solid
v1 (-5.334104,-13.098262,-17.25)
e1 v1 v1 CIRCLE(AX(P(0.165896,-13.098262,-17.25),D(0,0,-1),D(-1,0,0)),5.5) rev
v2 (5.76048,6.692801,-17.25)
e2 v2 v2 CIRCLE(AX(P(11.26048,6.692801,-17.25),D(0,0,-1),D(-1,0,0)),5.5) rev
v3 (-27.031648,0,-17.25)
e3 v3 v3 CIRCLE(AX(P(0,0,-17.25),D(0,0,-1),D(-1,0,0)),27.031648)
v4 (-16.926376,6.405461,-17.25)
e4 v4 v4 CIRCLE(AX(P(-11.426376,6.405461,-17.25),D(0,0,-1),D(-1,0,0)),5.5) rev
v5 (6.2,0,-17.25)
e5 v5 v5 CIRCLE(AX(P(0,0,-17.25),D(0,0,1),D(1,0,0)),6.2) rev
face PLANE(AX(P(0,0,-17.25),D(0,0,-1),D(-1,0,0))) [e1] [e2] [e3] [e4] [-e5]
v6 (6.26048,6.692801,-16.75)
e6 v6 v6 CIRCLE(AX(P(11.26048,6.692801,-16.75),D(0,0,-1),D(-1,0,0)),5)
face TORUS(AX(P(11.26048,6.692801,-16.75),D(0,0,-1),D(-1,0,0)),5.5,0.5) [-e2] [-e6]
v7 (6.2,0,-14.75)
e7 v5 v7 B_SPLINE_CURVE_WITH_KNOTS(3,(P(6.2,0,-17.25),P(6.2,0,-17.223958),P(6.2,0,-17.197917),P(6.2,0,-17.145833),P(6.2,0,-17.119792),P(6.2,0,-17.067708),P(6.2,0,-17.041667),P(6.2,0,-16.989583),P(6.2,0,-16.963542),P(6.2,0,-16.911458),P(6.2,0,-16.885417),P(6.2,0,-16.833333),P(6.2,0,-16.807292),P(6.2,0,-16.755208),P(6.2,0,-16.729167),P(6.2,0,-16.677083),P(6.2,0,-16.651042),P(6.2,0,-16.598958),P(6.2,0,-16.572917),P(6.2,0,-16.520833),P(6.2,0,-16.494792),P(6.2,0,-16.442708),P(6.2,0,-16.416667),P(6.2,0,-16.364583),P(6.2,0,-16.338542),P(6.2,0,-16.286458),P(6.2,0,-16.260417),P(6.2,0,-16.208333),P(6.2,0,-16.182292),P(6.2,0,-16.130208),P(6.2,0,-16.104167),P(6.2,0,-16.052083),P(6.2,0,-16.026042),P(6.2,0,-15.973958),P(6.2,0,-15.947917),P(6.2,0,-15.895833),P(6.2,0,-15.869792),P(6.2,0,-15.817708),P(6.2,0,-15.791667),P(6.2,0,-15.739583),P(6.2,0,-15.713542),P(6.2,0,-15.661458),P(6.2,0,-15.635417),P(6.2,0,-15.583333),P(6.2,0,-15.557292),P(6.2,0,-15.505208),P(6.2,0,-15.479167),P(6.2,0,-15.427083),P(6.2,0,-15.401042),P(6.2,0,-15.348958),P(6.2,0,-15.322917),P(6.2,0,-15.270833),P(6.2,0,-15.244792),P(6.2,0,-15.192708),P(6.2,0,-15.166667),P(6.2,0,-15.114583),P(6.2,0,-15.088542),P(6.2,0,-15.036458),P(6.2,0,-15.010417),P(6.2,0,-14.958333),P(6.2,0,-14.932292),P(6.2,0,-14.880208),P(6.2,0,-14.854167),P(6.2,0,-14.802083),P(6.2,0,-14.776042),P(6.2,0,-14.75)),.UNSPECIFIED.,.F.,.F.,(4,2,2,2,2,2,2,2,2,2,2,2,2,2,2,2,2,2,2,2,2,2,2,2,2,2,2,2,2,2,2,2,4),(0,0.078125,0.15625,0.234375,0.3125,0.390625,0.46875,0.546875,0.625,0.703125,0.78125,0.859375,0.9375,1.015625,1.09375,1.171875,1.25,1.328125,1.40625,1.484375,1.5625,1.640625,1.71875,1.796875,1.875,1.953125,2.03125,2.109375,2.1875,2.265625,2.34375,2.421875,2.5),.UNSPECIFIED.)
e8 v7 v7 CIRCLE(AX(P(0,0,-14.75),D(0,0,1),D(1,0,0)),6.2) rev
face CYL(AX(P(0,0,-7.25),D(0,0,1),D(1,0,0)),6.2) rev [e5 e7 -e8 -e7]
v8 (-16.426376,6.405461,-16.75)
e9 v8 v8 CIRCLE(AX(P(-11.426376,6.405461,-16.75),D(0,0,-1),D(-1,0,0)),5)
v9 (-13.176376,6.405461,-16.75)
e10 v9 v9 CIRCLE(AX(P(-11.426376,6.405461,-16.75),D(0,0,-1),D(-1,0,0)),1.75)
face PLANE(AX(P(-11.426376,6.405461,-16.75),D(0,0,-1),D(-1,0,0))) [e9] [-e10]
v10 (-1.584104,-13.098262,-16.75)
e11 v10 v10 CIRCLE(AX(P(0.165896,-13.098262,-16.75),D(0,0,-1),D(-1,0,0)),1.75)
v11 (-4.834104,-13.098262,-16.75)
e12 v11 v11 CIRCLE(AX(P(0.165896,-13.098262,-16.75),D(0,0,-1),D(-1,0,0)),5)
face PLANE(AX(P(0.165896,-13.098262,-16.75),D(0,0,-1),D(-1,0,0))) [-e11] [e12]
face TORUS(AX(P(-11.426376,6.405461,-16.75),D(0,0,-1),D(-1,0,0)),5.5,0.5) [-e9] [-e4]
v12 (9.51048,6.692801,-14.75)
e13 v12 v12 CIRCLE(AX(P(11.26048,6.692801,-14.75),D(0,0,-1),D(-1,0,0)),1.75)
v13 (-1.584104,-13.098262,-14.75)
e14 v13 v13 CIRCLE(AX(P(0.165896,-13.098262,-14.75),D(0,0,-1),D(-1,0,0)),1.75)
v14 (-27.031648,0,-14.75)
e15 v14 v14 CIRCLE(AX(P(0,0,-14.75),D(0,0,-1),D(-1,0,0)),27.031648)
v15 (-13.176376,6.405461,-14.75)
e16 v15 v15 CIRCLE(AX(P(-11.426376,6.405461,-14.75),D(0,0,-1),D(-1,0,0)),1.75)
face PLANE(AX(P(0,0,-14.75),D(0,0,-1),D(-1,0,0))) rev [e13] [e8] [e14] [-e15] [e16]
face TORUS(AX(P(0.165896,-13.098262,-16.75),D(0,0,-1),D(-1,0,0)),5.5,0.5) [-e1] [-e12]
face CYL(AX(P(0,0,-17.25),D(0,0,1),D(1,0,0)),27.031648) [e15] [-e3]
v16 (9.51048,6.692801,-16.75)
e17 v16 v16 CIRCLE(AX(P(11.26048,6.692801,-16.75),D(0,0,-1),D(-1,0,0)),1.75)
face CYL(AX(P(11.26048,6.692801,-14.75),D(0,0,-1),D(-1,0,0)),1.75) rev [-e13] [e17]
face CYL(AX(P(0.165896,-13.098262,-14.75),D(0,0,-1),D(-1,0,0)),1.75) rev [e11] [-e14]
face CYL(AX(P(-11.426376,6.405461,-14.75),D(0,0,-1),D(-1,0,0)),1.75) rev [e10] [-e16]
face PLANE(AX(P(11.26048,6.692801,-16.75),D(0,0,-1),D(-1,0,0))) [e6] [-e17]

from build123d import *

# Parameters (mm, degrees)
BOSS_EXTRUDE1_DEPTH      = 7.25
BOSS_EXTRUDE1_DEPTH_BACK = 7.25
SKETCH7_R                = 22.031647778
CUT_EXTRUDE3_DEPTH       = 36.98314894
CUT_EXTRUDE3_DEPTH_BACK  = 36.98314894
SKETCH15_R               = 8.008120878
SKETCH15_R_2             = 2.25
BOSS_EXTRUDE2_DEPTH      = 5.5
SKETCH16_R               = 5
CUT_EXTRUDE4_DEPTH       = 3
BOSS_EXTRUDE3_START      = 7.5
SKETCH17_R               = 22.031647778
SKETCH17_R_2             = 5
BOSS_EXTRUDE3_DEPTH      = 7.5
CUT_EXTRUDE2_DEPTH       = 36.98314894
CUT_EXTRUDE2_DEPTH_BACK  = 36.98314894
FILLET2_R                = 0.51
BOSS_EXTRUDE4_START      = 2.5
SKETCH18_R               = 27.031647778
SKETCH18_R_2             = 22.031647778
SKETCH18_R_3             = 5
BOSS_EXTRUDE4_DEPTH      = 2.5
BOSS_EXTRUDE5_START      = -2.5
SKETCH19_R               = 27.031647778
SKETCH19_R_2             = 19
BOSS_EXTRUDE5_DEPTH      = 2.5
CUT_EXTRUDE5_DEPTH       = 52.999831377
SKETCH21_R               = 8.008120878
SKETCH21_R_2             = 6.2
SKETCH21_R_3             = 2.25
BOSS_EXTRUDE6_DEPTH      = 2.5
SKETCH21_4_R             = 8.008120878
SKETCH21_4_R_2           = 6.2
BOSS_EXTRUDE7_DEPTH      = 12
CUT_EXTRUDE6_DEPTH       = 43.254230122
CUT_EXTRUDE6_DEPTH_BACK  = 43.254230122
SKETCH22_W               = 54.063295556
SKETCH22_H               = 32.75
SKETCH24_R               = 1.75
CUT_EXTRUDE7_DEPTH       = 39.310180934
SKETCH24_3_R             = 5
SKETCH24_3_R_2           = 1.75
CUT_EXTRUDE8_DEPTH       = 0.5
FILLET4_R                = 0.5


with BuildPart() as part:
    # Sketch7 → Boss-Extrude1 (new, two sides: drawn at the far end of the back side and taken through both)
    with BuildSketch(Plane.XY.offset(-BOSS_EXTRUDE1_DEPTH_BACK)):
        Circle(SKETCH7_R)
    extrude(amount=BOSS_EXTRUDE1_DEPTH + BOSS_EXTRUDE1_DEPTH_BACK)

    # Sketch14 → Revolve1 (revolve)
    with BuildSketch(Plane(origin=(0, 0, 0), x_dir=(0, 0, -1), z_dir=(1, 0, 0)), mode=Mode.PRIVATE) as revolve1_sk:
        Polygon((-18, 6.739517467), (-18, 0), (0, 0), (0, 19), (-3.355534752, 19), (-11.020158508, 12.583105693), align=None)
        with BuildLine():
            ThreePointArc((-7.25, 19), (-8.580081567, 15.465471544), (-11.020158508, 12.583105693))
            Line((-11.020158508, 12.583105693), (-3.355534752, 19))
            Line((-3.355534752, 19), (-7.25, 19))
        make_face()
        with BuildLine():
            Line((-18, 10), (-18, 6.739517467))
            Line((-18, 6.739517467), (-11.020158508, 12.583105693))
            ThreePointArc((-11.020158508, 12.583105693), (-14.286666254, 10.687865845), (-18, 10))
        make_face()
    revolve(revolve1_sk.sketch.rotate(Axis((0, 0, -36.129595921), (0, 0, 1)), 270), axis=Axis((0, 0, -36.129595921), (0, 0, 1)))

    # Sketch10 → Cut-Extrude3 (cut, two sides: drawn at the far end of the back side and taken through both)
    with BuildSketch(Plane.XY.offset(-CUT_EXTRUDE3_DEPTH_BACK)):
        with BuildLine():
            Line((2.2, 7.7), (-2.2, 7.7))
            Line((-2.2, 7.7), (-2.2, 5.796550698))
            ThreePointArc((-2.2, 5.796550698), (0, 6.2), (2.2, 5.796550698))
            Line((2.2, 5.796550698), (2.2, 7.7))
        make_face()
        with BuildLine():
            ThreePointArc((2.2, 5.796550698), (0, 6.2), (-2.2, 5.796550698))
            Line((-2.2, 5.796550698), (-2.2, 0))
            Line((-2.2, 0), (2.2, 0))
            Line((2.2, 0), (2.2, 5.796550698))
        make_face()
        with BuildLine():
            Line((-2.2, 0), (-2.2, 5.796550698))
            ThreePointArc((-2.2, 5.796550698), (-3.521363372, -5.102940329), (6.2, 0))
            ThreePointArc((6.2, 0), (5.102940329, 3.521363372), (2.2, 5.796550698))
            Line((2.2, 5.796550698), (2.2, 0))
            Line((2.2, 0), (-2.2, 0))
        make_face()
    extrude(amount=CUT_EXTRUDE3_DEPTH + CUT_EXTRUDE3_DEPTH_BACK, mode=Mode.SUBTRACT)

    # Sketch15 → Boss-Extrude2 (add)
    with BuildSketch(Plane(origin=(0, 0, -7.25), x_dir=(-1, 0, 0), z_dir=(0, 0, -1))):
        Circle(SKETCH15_R)
        Circle(SKETCH15_R_2, mode=Mode.SUBTRACT)
    extrude(amount=-BOSS_EXTRUDE2_DEPTH)

    # Sketch16 → Cut-Extrude4 (cut)
    with BuildSketch(Plane(origin=(0, 0, -7.25), x_dir=(-1, 0, 0), z_dir=(0, 0, -1))):
        Circle(SKETCH16_R)
    extrude(amount=-CUT_EXTRUDE4_DEPTH, mode=Mode.SUBTRACT)

    # Sketch17 → Boss-Extrude3 (add)
    with BuildSketch(Plane(origin=(0, 0, -7.25), x_dir=(-1, 0, 0), z_dir=(0, 0, -1)).offset(BOSS_EXTRUDE3_START)):
        with Locations(Location((0, 0, 0), (0, 0, 180))):
            Circle(SKETCH17_R)
        Circle(SKETCH17_R_2, mode=Mode.SUBTRACT)
    extrude(amount=-BOSS_EXTRUDE3_DEPTH)

    # Sketch8 → Cut-Extrude2 (cut, two sides: drawn at the far end of the back side and taken through both)
    with BuildSketch(Plane.XY.offset(-CUT_EXTRUDE2_DEPTH_BACK)):
        Polygon((-1.629816853, 19.998625671), (-2.369776385, 22.031647778), (2.369776385, 22.031647778), (1.629816853, 19.998625671), align=None)
        Polygon((6.645262089, 18.932559877), (6.796180007, 21.090786644), (11.125976911, 19.16303686), (9.623085654, 17.606747406), align=None)
        Polygon((13.771314846, 14.592882482), (14.787015134, 16.503136895), (17.958394952, 12.980962779), (15.952435523, 12.170502561), align=None)
        Polygon((18.516182157, 7.729963135), (20.221041008, 9.061944851), (21.68564336, 4.554362304), (19.523464367, 4.629867259), align=None)
        Polygon((20.059433359, -0.469537064), (22.15866519, 0.053860216), (21.663247022, -4.659728787), (19.718708857, -3.711314154), align=None)
        Polygon((18.134226299, -8.587850038), (20.264854855, -8.963537338), (17.89507847, -13.06811044), (16.504409446, -11.410775634), align=None)
        Polygon((13.073446767, -15.221245722), (14.867067016, -16.431057856), (11.032688279, -19.216897077), (10.436347704, -17.137210342), align=None)
        Polygon((5.752149521, -19.222749741), (6.898628226, -21.057499199), (2.262646056, -22.042907629), (2.563746633, -19.900465696), align=None)
        Polygon((-2.563746633, -19.900465696), (-2.262646056, -22.042907629), (-6.898628226, -21.057499199), (-5.752149521, -19.222749741), align=None)
        Polygon((-10.436347704, -17.137210342), (-11.032688279, -19.216897077), (-14.867067016, -16.431057856), (-13.073446767, -15.221245722), align=None)
        Polygon((-16.504409446, -11.410775634), (-17.89507847, -13.06811044), (-20.264854855, -8.963537338), (-18.134226299, -8.587850038), align=None)
        Polygon((-19.718708857, -3.711314154), (-21.663247022, -4.659728787), (-22.15866519, 0.053860216), (-20.059433359, -0.469537064), align=None)
        Polygon((-19.523464367, 4.629867259), (-21.68564336, 4.554362304), (-20.221041008, 9.061944851), (-18.516182157, 7.729963135), align=None)
        Polygon((-15.952435523, 12.170502561), (-17.958394952, 12.980962779), (-14.787015134, 16.503136895), (-13.771314846, 14.592882482), align=None)
        Polygon((-9.623085654, 17.606747406), (-11.125976911, 19.16303686), (-6.796180007, 21.090786644), (-6.645262089, 18.932559877), align=None)
    extrude(amount=CUT_EXTRUDE2_DEPTH + CUT_EXTRUDE2_DEPTH_BACK, mode=Mode.SUBTRACT)

    # Fillet2
    fillet2_edges = [part.edges().sort_by_distance(p)[0] for p in [
        (6.787047671, 20.960188161, -3.75),
        (11.035034049, 19.06886277, -3.75),
        (9.623085654, 17.606747406, -3.75),
        (6.645262089, 18.932559877, -3.75),
        (14.725553141, 16.387543699, -3.75),
        (17.837010461, 12.931920261, -3.75),
        (15.952435523, 12.170502561, -3.75),
        (13.771314846, 14.592882482, -3.75),
        (20.117876696, 8.981344056, -3.75),
        (21.55480572, 4.558931255, -3.75),
        (19.523464367, 4.629867259, -3.75),
        (18.516182157, 7.729963135, -3.75),
        (22.031636605, 0.022188433, -3.75),
        (21.545579251, -4.60233838, -3.75),
        (19.718708857, -3.711314154, -3.75),
        (20.059433359, -0.469537064, -3.75),
        (20.135926394, -8.940803772, -3.75),
        (17.810926394, -12.9678219, -3.75),
        (16.504409446, -11.410775634, -3.75),
        (18.134226299, -8.587850038, -3.75),
        (14.75853158, -16.35784978, -3.75),
        (10.996602556, -19.091051203, -3.75),
        (10.436347704, -17.137210342, -3.75),
        (13.073446767, -15.221245722, -3.75),
        (6.829252579, -20.946474955, -3.75),
        (2.280866235, -21.913264317, -3.75),
        (2.563746633, -19.900465696, -3.75),
        (5.752149521, -19.222749741, -3.75),
        (-2.280866235, -21.913264317, -3.75),
        (-6.829252579, -20.946474955, -3.75),
        (-5.752149521, -19.222749741, -3.75),
        (-2.563746633, -19.900465696, -3.75),
        (-10.996602556, -19.091051203, -3.75),
        (-14.75853158, -16.35784978, -3.75),
        (-13.073446767, -15.221245722, -3.75),
        (-10.436347704, -17.137210342, -3.75),
        (-17.810926394, -12.9678219, -3.75),
        (-20.135926394, -8.940803772, -3.75),
        (-18.134226299, -8.587850038, -3.75),
        (-16.504409446, -11.410775634, -3.75),
        (-21.545579251, -4.60233838, -3.75),
        (-22.031636605, 0.022188433, -3.75),
        (-20.059433359, -0.469537064, -3.75),
        (-19.718708857, -3.711314154, -3.75),
        (-21.55480572, 4.558931255, -3.75),
        (-20.117876696, 8.981344056, -3.75),
        (-18.516182157, 7.729963135, -3.75),
        (-19.523464367, 4.629867259, -3.75),
        (-17.837010461, 12.931920261, -3.75),
        (-14.725553141, 16.387543699, -3.75),
        (-13.771314846, 14.592882482, -3.75),
        (-15.952435523, 12.170502561, -3.75),
        (-11.035034049, 19.06886277, -3.75),
        (-6.787047671, 20.960188161, -3.75),
        (-6.645262089, 18.932559877, -3.75),
        (-9.623085654, 17.606747406, -3.75),
        (-2.325, 21.908625671, -3.75),
        (2.325, 21.908625671, -3.75),
        (1.629816853, 19.998625671, -3.75),
        (-1.629816853, 19.998625671, -3.75),
    ]]
    fillet(fillet2_edges, radius=FILLET2_R)

    # Sketch18 → Boss-Extrude4 (add)
    # profile 1 of 2: a face of its own
    with BuildSketch(Plane(origin=(0, 0, -14.75), x_dir=(-1, 0, 0), z_dir=(0, 0, -1)).offset(BOSS_EXTRUDE4_START)):
        Circle(SKETCH18_R)
        Circle(SKETCH18_R_2, mode=Mode.SUBTRACT)
    # profile 2 of 2: a face of its own
    with BuildSketch(Plane(origin=(0, 0, -14.75), x_dir=(-1, 0, 0), z_dir=(0, 0, -1)).offset(BOSS_EXTRUDE4_START)):
        Circle(SKETCH18_R_2)
        Circle(SKETCH18_R_3, mode=Mode.SUBTRACT)
    extrude(amount=-BOSS_EXTRUDE4_DEPTH)

    # Sketch19 → Boss-Extrude5 (add)
    with BuildSketch(Plane.XY.offset(7.25).offset(BOSS_EXTRUDE5_START)):
        with Locations(Location((0, 0, 0), (0, 0, 180))):
            Circle(SKETCH19_R)
        Circle(SKETCH19_R_2, mode=Mode.SUBTRACT)
    extrude(amount=BOSS_EXTRUDE5_DEPTH)

    # Sketch20 → Cut-Extrude5 (cut, through all)
    with BuildSketch(Plane.XY.offset(18)):
        with BuildLine():
            Line((-2.2, 7.7), (-2.2, 5.796550698))
            ThreePointArc((-2.2, 5.796550698), (0, 6.2), (2.2, 5.796550698))
            Line((2.2, 5.796550698), (2.2, 7.7))
            Line((2.2, 7.7), (-2.2, 7.7))
        make_face()
        with BuildLine():
            ThreePointArc((2.2, 5.796550698), (0, 6.2), (-2.2, 5.796550698))
            ThreePointArc((-2.2, 5.796550698), (-3.521363372, -5.102940329), (6.2, 0))
            ThreePointArc((6.2, 0), (5.102940329, 3.521363372), (2.2, 5.796550698))
        make_face()
    extrude(amount=-CUT_EXTRUDE5_DEPTH, mode=Mode.SUBTRACT)

    # Sketch21 → Boss-Extrude6 (add)
    # profile 1 of 2: a face of its own
    with BuildSketch(Plane.XY.offset(-5.25)):
        Circle(SKETCH21_R)
        Circle(SKETCH21_R_2, mode=Mode.SUBTRACT)
    # profile 2 of 2: a face of its own
    with BuildSketch(Plane.XY.offset(-5.25)):
        Circle(SKETCH21_R_2)
        Circle(SKETCH21_R_3, mode=Mode.SUBTRACT)
    extrude(amount=-BOSS_EXTRUDE6_DEPTH)

    # Sketch21<4> → Boss-Extrude7 (add)
    with BuildSketch(Plane.XY.offset(-5.25)):
        Circle(SKETCH21_4_R)
        Circle(SKETCH21_4_R_2, mode=Mode.SUBTRACT)
    extrude(amount=-BOSS_EXTRUDE7_DEPTH)

    # Sketch22 → Cut-Extrude6 (cut, two sides: drawn at the far end of the back side and taken through both)
    with BuildSketch(Plane(origin=(0, 0, 0), x_dir=(1, 0, 0), z_dir=(0, 1, 0)).offset(-CUT_EXTRUDE6_DEPTH_BACK)):
        with Locations((0, -1.625)):
            Rectangle(SKETCH22_W, SKETCH22_H)
    extrude(amount=CUT_EXTRUDE6_DEPTH + CUT_EXTRUDE6_DEPTH_BACK, mode=Mode.SUBTRACT)

    # Sketch24 → Cut-Extrude7 (cut, through all)
    with BuildSketch(Plane(origin=(0, 0, -17.25), x_dir=(-1, 0, 0), z_dir=(0, 0, -1))):
        with Locations((11.42637589, 6.405461013)):
            Circle(SKETCH24_R)
        with Locations((-0.165895985, -13.0982623)):
            Circle(SKETCH24_R)
        with Locations((-11.260479905, 6.692801288)):
            Circle(SKETCH24_R)
    extrude(amount=-CUT_EXTRUDE7_DEPTH, mode=Mode.SUBTRACT)

    # Sketch24<3> → Cut-Extrude8 (cut)
    # profile 1 of 3: a face of its own
    with BuildSketch(Plane(origin=(0, 0, -17.25), x_dir=(-1, 0, 0), z_dir=(0, 0, -1))):
        with Locations((-11.260479905, 6.692801288)):
            Circle(SKETCH24_3_R)
        with Locations((-11.260479905, 6.692801288)):
            Circle(SKETCH24_3_R_2, mode=Mode.SUBTRACT)
    # profile 2 of 3: a face of its own
    with BuildSketch(Plane(origin=(0, 0, -17.25), x_dir=(-1, 0, 0), z_dir=(0, 0, -1))):
        with Locations((11.42637589, 6.405461013)):
            Circle(SKETCH24_3_R)
        with Locations((11.42637589, 6.405461013)):
            Circle(SKETCH24_3_R_2, mode=Mode.SUBTRACT)
    # profile 3 of 3: a face of its own
    with BuildSketch(Plane(origin=(0, 0, -17.25), x_dir=(-1, 0, 0), z_dir=(0, 0, -1))):
        with Locations((-0.165895985, -13.0982623)):
            Circle(SKETCH24_3_R)
        with Locations((-0.165895985, -13.0982623)):
            Circle(SKETCH24_3_R_2, mode=Mode.SUBTRACT)
    extrude(amount=-CUT_EXTRUDE8_DEPTH, mode=Mode.SUBTRACT)

    # Fillet4
    fillet4_edges = [part.edges().sort_by_distance(p)[0] for p in [
        (16.260479905, 6.692801288, -17.25),
        (-6.42637589, 6.405461013, -17.25),
        (5.165895985, -13.0982623, -17.25),
    ]]
    fillet(fillet4_edges, radius=FILLET4_R - 0.0001)  # a hair under: the kernel refuses the full size


solid = part.part
